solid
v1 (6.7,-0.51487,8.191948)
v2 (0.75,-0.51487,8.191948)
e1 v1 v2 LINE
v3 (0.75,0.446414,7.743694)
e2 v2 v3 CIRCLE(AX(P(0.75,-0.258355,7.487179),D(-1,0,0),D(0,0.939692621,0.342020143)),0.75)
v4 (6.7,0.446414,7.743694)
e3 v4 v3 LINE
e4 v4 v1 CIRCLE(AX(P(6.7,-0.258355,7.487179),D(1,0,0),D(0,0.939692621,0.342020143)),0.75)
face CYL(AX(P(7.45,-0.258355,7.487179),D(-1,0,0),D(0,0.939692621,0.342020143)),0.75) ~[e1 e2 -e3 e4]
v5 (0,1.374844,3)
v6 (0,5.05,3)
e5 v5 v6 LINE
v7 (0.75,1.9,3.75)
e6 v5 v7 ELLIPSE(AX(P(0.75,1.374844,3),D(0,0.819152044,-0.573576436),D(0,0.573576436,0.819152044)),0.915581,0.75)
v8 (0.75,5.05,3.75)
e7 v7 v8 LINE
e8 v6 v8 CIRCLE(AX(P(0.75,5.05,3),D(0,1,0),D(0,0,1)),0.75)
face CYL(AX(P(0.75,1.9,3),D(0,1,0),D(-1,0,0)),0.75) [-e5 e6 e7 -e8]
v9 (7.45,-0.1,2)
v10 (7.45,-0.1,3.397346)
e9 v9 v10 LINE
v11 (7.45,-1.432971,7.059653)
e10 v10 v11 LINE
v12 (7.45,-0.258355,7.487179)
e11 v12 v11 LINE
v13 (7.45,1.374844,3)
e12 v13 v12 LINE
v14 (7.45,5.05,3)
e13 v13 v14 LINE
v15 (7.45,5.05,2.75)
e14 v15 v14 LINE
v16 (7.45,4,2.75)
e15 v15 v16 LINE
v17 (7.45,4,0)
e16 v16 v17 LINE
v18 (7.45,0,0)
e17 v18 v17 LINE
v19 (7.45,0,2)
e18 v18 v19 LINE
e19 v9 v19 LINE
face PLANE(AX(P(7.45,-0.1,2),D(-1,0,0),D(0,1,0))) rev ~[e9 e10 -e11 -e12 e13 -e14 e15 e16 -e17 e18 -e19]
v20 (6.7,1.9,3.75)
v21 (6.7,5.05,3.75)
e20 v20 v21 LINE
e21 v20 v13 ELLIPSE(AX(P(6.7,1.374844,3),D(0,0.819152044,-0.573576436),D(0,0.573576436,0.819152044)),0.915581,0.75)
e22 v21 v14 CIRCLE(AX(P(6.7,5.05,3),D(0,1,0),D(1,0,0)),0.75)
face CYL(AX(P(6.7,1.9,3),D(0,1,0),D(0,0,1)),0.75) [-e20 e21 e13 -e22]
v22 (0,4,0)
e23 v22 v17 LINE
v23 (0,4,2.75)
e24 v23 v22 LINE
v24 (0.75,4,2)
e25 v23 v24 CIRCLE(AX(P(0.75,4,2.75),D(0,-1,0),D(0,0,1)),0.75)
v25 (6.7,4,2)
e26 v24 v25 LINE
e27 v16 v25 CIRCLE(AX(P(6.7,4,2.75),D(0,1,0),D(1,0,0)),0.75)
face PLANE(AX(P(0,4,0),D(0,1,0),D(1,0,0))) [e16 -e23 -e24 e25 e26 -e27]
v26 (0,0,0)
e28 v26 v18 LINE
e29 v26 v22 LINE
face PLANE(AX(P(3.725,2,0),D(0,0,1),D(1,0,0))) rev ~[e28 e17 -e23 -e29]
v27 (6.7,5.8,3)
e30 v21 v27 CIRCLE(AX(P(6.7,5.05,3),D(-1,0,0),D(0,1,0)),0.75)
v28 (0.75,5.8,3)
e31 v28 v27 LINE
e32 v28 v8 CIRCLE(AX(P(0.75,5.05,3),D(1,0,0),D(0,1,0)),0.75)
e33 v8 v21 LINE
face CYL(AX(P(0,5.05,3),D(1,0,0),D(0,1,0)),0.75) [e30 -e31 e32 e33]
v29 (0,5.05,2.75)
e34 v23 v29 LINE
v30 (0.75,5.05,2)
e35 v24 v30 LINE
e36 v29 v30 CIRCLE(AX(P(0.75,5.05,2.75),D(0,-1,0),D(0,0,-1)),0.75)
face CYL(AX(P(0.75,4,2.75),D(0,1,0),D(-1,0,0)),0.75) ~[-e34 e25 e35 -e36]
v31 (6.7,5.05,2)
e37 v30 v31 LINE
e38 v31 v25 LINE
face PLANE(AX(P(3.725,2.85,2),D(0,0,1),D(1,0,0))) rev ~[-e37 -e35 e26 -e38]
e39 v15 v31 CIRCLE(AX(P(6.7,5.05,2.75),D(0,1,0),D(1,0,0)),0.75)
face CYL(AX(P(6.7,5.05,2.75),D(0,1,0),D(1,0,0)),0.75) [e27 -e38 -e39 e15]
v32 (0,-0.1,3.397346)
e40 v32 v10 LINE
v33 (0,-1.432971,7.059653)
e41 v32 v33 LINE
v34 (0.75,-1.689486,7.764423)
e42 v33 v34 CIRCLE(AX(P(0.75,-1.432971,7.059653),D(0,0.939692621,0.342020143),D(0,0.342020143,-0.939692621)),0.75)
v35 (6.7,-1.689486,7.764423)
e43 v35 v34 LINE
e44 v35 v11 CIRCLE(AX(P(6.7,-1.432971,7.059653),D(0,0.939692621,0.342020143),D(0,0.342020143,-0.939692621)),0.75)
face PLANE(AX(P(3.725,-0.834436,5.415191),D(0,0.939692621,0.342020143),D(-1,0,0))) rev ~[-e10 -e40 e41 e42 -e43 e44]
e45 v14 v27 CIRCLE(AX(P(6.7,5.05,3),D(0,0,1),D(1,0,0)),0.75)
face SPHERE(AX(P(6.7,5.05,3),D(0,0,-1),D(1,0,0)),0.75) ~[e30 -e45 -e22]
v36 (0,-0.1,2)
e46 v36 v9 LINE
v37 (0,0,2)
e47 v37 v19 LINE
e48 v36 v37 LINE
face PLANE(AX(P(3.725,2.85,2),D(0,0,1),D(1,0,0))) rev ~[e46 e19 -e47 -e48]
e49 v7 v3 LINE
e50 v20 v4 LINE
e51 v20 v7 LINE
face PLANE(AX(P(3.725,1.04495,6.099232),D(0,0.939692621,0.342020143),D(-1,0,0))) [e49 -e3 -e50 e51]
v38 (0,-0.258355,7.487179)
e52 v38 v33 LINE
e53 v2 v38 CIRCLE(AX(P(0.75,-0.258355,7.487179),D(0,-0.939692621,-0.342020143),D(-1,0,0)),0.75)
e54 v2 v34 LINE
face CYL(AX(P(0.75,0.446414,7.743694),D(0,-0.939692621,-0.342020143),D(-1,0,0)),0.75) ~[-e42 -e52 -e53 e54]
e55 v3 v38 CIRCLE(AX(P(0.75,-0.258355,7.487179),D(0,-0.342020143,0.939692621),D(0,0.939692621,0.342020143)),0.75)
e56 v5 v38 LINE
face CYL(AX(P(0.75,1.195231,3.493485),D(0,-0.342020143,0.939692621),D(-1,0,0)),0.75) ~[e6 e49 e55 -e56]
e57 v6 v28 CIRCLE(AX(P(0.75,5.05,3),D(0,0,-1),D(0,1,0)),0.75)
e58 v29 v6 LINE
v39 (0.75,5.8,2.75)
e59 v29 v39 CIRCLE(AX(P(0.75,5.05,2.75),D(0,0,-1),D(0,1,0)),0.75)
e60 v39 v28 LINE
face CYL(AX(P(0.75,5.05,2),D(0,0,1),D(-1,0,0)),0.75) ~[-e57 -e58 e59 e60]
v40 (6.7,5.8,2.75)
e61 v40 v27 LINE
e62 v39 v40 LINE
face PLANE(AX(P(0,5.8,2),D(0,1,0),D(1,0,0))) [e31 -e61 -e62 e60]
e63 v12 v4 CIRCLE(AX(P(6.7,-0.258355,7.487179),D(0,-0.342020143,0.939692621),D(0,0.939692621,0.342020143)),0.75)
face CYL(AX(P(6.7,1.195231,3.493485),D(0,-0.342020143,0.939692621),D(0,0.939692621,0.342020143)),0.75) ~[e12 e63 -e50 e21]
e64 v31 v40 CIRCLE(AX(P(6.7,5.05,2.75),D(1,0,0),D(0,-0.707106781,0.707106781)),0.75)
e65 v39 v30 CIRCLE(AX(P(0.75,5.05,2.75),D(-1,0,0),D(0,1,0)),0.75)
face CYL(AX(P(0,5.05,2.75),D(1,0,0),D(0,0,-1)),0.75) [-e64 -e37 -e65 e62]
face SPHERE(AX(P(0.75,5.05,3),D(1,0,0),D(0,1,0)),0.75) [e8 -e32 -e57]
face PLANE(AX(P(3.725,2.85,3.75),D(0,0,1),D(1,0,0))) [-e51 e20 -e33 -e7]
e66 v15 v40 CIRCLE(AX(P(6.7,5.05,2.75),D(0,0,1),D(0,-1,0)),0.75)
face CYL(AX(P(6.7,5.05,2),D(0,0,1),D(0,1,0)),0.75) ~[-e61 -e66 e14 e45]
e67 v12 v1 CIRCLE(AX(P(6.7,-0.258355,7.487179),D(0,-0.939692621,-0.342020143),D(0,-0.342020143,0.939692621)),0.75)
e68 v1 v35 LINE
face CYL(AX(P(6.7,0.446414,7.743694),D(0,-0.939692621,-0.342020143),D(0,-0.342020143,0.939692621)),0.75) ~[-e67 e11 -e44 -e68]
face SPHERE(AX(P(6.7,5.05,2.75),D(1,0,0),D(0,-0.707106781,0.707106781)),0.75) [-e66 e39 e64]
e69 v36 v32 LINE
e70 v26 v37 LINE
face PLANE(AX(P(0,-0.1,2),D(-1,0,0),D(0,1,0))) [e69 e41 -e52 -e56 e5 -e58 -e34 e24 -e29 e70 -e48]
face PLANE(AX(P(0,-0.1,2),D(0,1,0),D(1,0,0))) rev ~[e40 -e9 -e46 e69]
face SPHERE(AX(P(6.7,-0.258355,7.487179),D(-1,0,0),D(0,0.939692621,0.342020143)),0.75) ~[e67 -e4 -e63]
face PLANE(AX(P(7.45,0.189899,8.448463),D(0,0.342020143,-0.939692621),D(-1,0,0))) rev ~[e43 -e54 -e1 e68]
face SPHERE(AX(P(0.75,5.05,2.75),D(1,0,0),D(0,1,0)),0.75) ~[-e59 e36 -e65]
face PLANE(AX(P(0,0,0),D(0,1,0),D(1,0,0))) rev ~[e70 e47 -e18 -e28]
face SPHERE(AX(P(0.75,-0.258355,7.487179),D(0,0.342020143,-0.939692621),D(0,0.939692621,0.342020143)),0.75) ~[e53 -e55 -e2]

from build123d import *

# Parameters (mm, degrees)
F0_W        = 7.45
F0_H        = 4
F1_DEPTH    = 2
F2_W        = 7.45
F2_H        = 5.9
F3_DEPTH    = 1.75
F6_W        = 7.45
F6_H        = 5
F7_DEPTH    = 2
F8_R        = 0.75
F9_T1_DEPTH = 1.05
F9_S5_W     = 0.75
F9_S5_H     = 0.75
F9_T6_DEPTH = 0.75


# Not quite as in the source:
# - a fillet or chamfer that OpenCascade refuses, or shapes differently, is made with other operations: its cross-section is extruded or revolved along the edge and cut away or added


with BuildPart() as f1:
    # F0 (on Top) → F1 (new body)
    with BuildSketch(Plane.XY):
        with Locations((3.725, 2)):
            Rectangle(F0_W, F0_H)
    extrude(amount=F1_DEPTH)

    # F2 (on face) → F3 (join)
    with BuildSketch(Plane.XY.offset(2)):
        with Locations((3.725, 2.85)):
            Rectangle(F2_W, F2_H)
    extrude(amount=F3_DEPTH)

    # F6 (on line) → F7 (join)
    with BuildSketch(Plane(origin=(0, 2.8829689891, 1.0493148984), x_dir=(-1, 0, 0), z_dir=(0, 0.9396926208, 0.3420201433))):
        with Locations((-3.725, 5.3740090556)):
            Rectangle(F6_W, F6_H)
    extrude(amount=-F7_DEPTH)

    # F8
    f8_edges = [f1.edges().sort_by_distance(p)[0] for p in [
        (7.45, 5.8, 2.875),
        (7.45, 3.85, 3.75),
        (3.725, 5.8, 3.75),
        (3.725, 5.8, 2),
        (0, 5.8, 2.875),
        (0, 3.85, 3.75),
        (0, 4.9, 2),
        (0, 1.04495, 6.099232),
        (3.725, 0.189899, 8.448463),
        (7.45, 1.04495, 6.099232),
        (7.45, -0.749793, 8.106443),
        (0, -0.749793, 8.106443),
    ]]
    fillet(f8_edges, radius=F8_R)

    # F9: fillet of radius 0.75 on 1 edges, made by hand

    # F9_s2 → F9_t1 (cut)
    with BuildSketch(Plane.XZ.offset(-5.05)):
        with BuildLine():
            ThreePointArc((7.45, 2.75), (7.2303300859, 2.2196699141), (6.7, 2))
            Line((6.7, 2), (7.45, 2))
            Line((7.45, 2), (7.45, 2.75))
        make_face()
    extrude(amount=F9_T1_DEPTH, mode=Mode.SUBTRACT)


with BuildPart() as f9_tool4:
    # F9_s5 → F9_t6 (new body)
    with BuildSketch(Plane.YZ.offset(6.7)):
        with Locations((5.425, 2.375)):
            Rectangle(F9_S5_W, F9_S5_H)
    extrude(amount=F9_T6_DEPTH)

    # F9_s7 → F9_t8 (revolve, cut)
    with BuildSketch(Plane(origin=(6.7, 5.05, 2.75), x_dir=(0, -0.7071067812, 0.7071067812), z_dir=(0, 0.7071067812, 0.7071067812))):
        with BuildLine():
            ThreePointArc((0, -0.75), (0.75, 0), (0, 0.75))
            Line((0, 0.75), (0, -0.75))
        make_face()
    revolve(axis=Axis((6.7, 5.05, 2.75), (1, 0, 0)), mode=Mode.SUBTRACT)


with BuildPart() as f1_1:
    add(f1.part)

    # F9_t3: cut F9_tool4
    add(f9_tool4.part, mode=Mode.SUBTRACT)


solid = f1_1.part
